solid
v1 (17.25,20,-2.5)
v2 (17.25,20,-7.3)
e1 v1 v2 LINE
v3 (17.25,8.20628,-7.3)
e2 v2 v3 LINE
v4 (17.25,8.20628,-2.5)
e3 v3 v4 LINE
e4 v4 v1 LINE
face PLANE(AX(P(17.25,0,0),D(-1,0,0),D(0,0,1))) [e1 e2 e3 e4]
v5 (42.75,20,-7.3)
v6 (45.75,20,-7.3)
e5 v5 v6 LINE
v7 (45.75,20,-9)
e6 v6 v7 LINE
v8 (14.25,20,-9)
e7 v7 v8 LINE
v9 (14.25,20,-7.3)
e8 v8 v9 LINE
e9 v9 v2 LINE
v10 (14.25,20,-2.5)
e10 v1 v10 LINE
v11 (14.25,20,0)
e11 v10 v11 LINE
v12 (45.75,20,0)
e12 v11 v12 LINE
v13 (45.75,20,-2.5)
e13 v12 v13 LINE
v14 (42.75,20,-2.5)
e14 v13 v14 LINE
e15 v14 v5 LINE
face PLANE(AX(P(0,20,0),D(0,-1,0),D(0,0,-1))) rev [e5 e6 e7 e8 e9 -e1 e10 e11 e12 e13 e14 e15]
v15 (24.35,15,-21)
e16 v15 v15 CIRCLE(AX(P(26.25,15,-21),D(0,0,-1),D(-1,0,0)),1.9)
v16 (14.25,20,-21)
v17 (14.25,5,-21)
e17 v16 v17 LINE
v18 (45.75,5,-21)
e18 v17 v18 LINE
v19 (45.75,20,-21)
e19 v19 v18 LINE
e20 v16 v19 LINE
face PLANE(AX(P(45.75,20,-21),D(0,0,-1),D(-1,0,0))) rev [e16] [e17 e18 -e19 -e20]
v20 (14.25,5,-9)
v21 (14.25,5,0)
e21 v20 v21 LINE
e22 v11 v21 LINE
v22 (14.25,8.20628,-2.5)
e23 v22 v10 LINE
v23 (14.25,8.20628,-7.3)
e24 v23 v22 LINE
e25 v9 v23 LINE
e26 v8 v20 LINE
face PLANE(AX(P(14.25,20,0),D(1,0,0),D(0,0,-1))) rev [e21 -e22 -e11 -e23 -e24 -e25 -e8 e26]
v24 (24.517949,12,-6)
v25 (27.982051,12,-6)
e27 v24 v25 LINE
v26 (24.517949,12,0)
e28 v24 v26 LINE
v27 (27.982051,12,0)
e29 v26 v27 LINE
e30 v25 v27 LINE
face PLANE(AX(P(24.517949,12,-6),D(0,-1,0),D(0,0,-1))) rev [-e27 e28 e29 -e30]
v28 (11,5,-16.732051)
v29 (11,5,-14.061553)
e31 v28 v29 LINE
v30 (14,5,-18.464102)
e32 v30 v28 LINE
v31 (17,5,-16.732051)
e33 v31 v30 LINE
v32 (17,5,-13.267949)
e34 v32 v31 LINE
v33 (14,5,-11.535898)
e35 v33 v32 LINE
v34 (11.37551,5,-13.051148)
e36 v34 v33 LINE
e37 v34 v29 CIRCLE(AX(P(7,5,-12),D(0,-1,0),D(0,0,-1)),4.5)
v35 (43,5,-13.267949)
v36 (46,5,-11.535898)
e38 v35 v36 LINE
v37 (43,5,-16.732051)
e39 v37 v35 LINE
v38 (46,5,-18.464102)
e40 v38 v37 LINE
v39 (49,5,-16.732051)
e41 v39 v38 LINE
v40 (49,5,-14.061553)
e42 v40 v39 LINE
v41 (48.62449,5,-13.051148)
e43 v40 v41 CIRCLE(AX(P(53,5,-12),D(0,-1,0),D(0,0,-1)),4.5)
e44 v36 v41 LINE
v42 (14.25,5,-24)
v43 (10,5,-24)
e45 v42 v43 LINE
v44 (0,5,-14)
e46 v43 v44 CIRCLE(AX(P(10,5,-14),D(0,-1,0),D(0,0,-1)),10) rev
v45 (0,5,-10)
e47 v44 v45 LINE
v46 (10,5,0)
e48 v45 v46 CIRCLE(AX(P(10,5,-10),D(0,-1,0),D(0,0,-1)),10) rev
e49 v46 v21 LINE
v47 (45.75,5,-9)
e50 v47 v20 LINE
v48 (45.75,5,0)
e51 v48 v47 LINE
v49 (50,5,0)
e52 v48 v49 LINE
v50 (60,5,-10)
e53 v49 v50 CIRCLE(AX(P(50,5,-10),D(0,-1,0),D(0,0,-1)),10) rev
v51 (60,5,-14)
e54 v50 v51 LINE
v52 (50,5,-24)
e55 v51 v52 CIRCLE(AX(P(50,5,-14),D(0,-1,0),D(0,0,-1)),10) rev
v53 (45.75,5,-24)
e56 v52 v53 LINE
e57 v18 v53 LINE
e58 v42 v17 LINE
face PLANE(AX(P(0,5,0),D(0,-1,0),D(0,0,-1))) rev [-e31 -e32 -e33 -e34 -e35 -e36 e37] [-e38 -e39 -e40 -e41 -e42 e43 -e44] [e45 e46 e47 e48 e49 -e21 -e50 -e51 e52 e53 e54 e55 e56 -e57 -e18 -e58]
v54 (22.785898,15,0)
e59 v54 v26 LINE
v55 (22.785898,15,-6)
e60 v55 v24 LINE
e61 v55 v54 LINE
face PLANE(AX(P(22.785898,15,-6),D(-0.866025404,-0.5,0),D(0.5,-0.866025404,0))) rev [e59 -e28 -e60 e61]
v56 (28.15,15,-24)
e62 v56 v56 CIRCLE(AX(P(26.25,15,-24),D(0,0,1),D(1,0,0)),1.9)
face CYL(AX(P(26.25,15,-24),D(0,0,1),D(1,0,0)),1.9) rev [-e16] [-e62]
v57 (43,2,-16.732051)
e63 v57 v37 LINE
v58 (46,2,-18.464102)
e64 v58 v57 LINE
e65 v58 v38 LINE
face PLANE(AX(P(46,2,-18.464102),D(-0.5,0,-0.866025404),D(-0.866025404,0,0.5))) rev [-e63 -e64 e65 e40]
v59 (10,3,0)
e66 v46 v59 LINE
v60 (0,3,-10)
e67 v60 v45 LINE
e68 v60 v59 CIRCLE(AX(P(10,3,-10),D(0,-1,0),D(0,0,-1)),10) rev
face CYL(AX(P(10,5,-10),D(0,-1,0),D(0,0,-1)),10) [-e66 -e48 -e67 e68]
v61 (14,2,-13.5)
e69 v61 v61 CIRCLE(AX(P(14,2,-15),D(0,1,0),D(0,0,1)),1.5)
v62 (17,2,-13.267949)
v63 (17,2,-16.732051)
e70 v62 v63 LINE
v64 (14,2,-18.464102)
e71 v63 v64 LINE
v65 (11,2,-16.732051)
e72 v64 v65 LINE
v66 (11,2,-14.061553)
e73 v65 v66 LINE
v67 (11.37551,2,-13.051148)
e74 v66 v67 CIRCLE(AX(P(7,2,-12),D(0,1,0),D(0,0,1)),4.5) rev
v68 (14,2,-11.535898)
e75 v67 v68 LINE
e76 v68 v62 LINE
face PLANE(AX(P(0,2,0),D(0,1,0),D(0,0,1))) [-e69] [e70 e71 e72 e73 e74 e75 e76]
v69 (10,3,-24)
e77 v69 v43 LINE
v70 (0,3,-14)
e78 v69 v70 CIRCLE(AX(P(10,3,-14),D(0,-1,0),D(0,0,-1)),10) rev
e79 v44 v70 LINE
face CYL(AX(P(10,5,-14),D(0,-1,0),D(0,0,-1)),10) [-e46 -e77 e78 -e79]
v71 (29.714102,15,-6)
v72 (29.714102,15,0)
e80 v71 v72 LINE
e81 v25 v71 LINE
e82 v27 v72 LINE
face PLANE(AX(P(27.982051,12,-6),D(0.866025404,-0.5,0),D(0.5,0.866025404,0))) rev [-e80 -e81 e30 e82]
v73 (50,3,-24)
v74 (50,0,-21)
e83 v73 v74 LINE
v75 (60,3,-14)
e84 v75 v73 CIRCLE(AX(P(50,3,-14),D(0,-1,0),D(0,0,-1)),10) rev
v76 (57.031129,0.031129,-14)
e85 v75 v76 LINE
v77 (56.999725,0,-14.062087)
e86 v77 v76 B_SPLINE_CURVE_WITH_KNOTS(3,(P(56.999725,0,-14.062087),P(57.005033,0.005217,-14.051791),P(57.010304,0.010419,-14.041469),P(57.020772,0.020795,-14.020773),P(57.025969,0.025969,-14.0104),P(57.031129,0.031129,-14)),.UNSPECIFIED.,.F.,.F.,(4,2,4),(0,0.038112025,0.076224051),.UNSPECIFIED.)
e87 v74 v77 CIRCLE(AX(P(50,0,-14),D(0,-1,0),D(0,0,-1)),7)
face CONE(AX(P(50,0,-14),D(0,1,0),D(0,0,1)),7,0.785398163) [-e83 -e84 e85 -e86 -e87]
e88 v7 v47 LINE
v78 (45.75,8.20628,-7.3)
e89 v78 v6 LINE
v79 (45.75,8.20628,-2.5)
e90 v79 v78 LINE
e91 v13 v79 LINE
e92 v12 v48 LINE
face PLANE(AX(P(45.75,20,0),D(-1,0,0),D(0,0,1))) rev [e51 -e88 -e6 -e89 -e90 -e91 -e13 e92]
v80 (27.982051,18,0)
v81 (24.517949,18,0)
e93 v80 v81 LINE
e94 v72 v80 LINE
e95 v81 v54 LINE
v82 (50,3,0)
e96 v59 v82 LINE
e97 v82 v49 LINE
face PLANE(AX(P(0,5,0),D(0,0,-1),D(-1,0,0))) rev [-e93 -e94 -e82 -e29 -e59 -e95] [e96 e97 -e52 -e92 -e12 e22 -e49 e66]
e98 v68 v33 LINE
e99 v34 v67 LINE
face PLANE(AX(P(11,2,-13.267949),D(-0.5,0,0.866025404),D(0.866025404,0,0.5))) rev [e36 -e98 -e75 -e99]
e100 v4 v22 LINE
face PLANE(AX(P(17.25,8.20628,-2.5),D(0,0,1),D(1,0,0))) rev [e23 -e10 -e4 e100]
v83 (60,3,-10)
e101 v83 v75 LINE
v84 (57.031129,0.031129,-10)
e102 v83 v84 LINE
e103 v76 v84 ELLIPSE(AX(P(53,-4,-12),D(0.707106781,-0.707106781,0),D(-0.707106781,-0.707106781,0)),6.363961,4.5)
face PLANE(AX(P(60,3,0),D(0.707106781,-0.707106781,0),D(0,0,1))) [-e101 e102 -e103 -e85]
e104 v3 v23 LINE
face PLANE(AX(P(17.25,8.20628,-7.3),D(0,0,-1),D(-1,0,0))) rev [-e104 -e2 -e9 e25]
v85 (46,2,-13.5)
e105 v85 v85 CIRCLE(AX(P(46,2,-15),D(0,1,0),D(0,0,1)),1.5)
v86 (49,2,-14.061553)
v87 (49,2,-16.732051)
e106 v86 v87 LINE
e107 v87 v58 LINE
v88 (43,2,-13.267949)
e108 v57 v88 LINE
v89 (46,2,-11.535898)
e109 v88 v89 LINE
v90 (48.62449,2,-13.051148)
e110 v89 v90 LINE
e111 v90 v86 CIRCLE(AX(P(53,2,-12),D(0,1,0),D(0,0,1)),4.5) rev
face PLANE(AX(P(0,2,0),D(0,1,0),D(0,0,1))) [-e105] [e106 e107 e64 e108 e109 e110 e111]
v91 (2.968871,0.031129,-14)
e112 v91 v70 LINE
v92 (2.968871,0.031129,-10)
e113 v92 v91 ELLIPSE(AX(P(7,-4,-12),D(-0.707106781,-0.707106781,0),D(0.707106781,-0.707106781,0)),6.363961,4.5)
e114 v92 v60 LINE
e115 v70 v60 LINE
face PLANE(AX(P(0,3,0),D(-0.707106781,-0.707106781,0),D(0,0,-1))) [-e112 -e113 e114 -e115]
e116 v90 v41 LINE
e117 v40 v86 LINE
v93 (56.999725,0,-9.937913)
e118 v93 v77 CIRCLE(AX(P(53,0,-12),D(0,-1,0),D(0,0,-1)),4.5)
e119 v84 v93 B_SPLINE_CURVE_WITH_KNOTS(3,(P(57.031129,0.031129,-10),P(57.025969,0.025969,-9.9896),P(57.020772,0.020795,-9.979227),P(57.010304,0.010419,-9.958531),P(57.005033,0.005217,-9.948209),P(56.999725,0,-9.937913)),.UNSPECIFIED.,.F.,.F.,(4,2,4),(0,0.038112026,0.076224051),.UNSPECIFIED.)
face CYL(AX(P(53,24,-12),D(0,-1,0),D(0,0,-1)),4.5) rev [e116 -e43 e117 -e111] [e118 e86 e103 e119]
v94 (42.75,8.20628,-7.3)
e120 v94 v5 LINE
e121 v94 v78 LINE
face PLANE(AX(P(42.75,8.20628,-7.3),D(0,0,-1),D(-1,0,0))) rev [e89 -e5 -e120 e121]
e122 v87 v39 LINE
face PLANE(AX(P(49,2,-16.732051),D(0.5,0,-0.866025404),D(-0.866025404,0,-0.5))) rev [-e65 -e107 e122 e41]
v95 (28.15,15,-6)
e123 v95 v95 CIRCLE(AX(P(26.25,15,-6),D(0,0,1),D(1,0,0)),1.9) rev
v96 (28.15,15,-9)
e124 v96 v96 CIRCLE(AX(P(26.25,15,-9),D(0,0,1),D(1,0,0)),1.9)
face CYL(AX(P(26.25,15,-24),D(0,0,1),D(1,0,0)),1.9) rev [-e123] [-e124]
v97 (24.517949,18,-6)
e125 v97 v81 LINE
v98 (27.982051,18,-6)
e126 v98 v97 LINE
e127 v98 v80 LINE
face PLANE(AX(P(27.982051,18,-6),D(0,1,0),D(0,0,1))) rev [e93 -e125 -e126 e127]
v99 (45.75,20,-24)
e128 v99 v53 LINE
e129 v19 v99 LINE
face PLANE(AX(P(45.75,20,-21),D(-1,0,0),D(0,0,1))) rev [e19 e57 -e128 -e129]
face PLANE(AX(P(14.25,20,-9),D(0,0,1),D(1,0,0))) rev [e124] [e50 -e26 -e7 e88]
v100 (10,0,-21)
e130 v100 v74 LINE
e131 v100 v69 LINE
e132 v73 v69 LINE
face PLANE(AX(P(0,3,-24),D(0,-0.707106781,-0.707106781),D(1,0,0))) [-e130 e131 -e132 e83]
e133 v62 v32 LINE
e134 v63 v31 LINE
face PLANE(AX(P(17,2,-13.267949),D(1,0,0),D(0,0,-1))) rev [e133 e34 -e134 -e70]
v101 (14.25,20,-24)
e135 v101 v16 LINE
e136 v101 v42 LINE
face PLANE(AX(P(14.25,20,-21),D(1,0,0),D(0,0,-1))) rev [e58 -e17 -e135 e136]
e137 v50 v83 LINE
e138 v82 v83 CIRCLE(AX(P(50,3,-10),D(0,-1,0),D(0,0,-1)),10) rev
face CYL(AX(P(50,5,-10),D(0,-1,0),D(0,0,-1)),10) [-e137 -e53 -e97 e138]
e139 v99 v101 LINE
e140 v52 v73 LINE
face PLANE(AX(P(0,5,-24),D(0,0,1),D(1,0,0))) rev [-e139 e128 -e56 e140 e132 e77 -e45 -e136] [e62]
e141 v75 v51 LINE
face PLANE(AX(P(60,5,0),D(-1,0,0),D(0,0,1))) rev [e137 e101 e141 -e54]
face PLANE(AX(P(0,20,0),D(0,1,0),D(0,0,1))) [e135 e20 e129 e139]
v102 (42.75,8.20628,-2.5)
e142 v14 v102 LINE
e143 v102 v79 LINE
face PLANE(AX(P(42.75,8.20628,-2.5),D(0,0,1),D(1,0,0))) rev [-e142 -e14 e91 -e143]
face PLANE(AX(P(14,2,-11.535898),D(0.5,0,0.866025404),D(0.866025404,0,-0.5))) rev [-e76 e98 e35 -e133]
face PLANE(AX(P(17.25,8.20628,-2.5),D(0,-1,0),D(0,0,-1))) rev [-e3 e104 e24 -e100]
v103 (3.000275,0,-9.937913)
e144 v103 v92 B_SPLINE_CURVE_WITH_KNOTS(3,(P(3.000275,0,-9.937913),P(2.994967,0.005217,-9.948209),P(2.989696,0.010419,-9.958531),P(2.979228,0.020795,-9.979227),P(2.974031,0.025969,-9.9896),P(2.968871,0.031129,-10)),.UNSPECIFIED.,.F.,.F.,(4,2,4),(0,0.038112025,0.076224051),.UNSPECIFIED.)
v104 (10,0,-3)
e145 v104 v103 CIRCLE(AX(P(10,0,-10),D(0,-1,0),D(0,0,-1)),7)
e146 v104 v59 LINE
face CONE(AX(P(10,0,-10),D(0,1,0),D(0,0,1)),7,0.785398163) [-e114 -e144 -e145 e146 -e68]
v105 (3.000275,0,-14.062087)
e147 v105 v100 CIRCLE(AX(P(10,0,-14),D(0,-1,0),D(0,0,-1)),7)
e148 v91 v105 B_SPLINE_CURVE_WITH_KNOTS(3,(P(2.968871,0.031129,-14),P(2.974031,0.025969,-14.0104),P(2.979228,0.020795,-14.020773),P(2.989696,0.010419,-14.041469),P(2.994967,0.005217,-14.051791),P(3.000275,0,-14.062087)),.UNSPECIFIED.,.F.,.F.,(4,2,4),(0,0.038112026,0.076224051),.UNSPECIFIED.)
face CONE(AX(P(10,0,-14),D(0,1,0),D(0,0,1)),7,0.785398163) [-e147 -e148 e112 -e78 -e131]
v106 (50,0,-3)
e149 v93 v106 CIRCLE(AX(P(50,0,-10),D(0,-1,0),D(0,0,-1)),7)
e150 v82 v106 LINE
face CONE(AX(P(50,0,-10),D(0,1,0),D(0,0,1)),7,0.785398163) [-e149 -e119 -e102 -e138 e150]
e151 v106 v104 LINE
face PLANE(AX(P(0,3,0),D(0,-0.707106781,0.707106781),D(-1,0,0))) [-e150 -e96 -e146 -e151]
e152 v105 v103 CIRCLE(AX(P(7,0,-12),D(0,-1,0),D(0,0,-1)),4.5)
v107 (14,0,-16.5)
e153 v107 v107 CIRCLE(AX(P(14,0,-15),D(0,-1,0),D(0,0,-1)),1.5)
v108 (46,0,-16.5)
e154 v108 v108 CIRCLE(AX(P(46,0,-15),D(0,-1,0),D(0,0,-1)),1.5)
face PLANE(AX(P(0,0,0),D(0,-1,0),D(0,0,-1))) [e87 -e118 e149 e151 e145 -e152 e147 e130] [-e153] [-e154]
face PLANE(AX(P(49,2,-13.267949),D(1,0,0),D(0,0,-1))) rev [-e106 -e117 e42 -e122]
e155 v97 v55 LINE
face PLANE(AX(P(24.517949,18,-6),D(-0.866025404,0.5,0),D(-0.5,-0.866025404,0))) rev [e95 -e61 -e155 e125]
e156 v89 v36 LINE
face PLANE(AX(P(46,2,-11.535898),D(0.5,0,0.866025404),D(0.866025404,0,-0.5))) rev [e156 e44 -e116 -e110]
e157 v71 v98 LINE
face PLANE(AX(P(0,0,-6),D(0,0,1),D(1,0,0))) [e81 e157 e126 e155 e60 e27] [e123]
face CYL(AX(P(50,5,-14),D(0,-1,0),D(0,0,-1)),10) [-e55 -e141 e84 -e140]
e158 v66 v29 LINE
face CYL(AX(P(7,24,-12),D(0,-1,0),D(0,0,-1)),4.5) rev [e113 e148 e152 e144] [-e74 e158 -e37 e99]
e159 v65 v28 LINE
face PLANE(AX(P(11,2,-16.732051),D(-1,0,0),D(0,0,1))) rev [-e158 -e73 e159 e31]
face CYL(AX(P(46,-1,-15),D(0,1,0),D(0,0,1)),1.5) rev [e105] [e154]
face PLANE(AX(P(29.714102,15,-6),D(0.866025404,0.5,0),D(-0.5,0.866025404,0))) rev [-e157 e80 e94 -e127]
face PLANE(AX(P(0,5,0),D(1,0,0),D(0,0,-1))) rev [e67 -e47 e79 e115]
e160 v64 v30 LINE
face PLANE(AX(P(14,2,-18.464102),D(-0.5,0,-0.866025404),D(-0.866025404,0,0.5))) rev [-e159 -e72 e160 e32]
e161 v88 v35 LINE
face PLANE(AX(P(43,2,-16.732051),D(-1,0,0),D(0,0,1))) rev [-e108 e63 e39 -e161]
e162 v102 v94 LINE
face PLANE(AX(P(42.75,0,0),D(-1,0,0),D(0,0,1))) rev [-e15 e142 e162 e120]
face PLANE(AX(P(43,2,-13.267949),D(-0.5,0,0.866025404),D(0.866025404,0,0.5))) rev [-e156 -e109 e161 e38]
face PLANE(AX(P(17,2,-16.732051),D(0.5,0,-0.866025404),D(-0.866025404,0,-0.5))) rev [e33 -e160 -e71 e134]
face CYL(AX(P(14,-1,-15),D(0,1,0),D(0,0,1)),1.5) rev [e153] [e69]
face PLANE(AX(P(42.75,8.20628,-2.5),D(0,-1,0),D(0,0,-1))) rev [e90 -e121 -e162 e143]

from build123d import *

# Parameters (mm, degrees)
SKETCH_1_W          = 60
SKETCH_1_H          = 24
EXTRUDE_1_DEPTH     = 5
SKETCH_2_W          = 31.5
SKETCH_2_H          = 9
SKETCH_2_H_2        = 3
EXTRUDE_2_DEPTH     = 15
SKETCH_3_R          = 1.9
CUT_EXTRUDE_1_DEPTH = 24
SKETCH_4_R          = 4.5
CUT_EXTRUDE_2_DEPTH = 24
FILLET_1_R          = 10
CUT_EXTRUDE_3_DEPTH = 3
SKETCH_7_R          = 1.5
CUT_EXTRUDE_4_DEPTH = 3
CUT_EXTRUDE_5_DEPTH = 6
SKETCH_9_W          = 4.8
SKETCH_9_H          = 12.477545801
CUT_EXTRUDE_6_DEPTH = 3
SKETCH_10_W         = 4.8
SKETCH_10_H         = 29.172350056
CUT_EXTRUDE_7_DEPTH = 3
CHAMFER_1_SIZE      = 3


with BuildPart() as part:
    # Эскиз1 → Бобышка-Вытянуть1 (new body)
    with BuildSketch(Plane(origin=(0, 0, 0), x_dir=(1, 0, 0), z_dir=(0, 1, 0))):
        with Locations((30, 12)):
            Rectangle(SKETCH_1_W, SKETCH_1_H)
    extrude(amount=EXTRUDE_1_DEPTH)

    # Эскиз2 → Бобышка-Вытянуть2 (add)
    with BuildSketch(Plane(origin=(0, 5, 0), x_dir=(1, 0, 0), z_dir=(0, 1, 0))):
        with Locations((30, 4.5)):
            Rectangle(SKETCH_2_W, SKETCH_2_H)
        with Locations((30, 22.5)):
            Rectangle(SKETCH_2_W, SKETCH_2_H_2)
    extrude(amount=EXTRUDE_2_DEPTH)

    # Эскиз3 → Вырез-Вытянуть1 (cut)
    with BuildSketch(Plane.XY):
        with Locations((26.25, 15)):
            Circle(SKETCH_3_R)
    extrude(amount=-CUT_EXTRUDE_1_DEPTH, mode=Mode.SUBTRACT)

    # Эскиз4 → Вырез-Вытянуть2 (cut)
    with BuildSketch(Plane.XZ):
        with Locations(Location((7, -12, 0), (0, 0, 270))):
            Circle(SKETCH_4_R)
        with Locations(Location((53, -12, 0), (0, 0, 270))):
            Circle(SKETCH_4_R)
    extrude(amount=-CUT_EXTRUDE_2_DEPTH, mode=Mode.SUBTRACT)

    # Скругление1
    fillet_1_edges = [part.edges().sort_by_distance(p)[0] for p in [
        (0, 2.5, -24),
        (60, 2.5, -24),
        (60, 2.5, 0),
        (0, 2.5, 0),
    ]]
    fillet(fillet_1_edges, radius=FILLET_1_R)

    # Эскиз5 → Вырез-Вытянуть3 (cut)
    with BuildSketch(Plane(origin=(0, 5, 0), x_dir=(1, 0, 0), z_dir=(0, 1, 0))):
        Polygon((43, 16.732050808), (43, 13.267949192), (46, 11.535898385), (49, 13.267949192), (49, 16.732050808), (46, 18.464101615), align=None)
        Polygon((11, 16.732050808), (11, 13.267949192), (14, 11.535898385), (17, 13.267949192), (17, 16.732050808), (14, 18.464101615), align=None)
    extrude(amount=-CUT_EXTRUDE_3_DEPTH, mode=Mode.SUBTRACT)

    # Эскиз7 → Вырез-Вытянуть4 (cut)
    with BuildSketch(Plane(origin=(0, 2, 0), x_dir=(1, 0, 0), z_dir=(0, 1, 0))):
        with Locations(Location((14, 15, 0), (0, 0, 270))):
            Circle(SKETCH_7_R)
        with Locations(Location((46, 15, 0), (0, 0, 270))):
            Circle(SKETCH_7_R)
    extrude(amount=-CUT_EXTRUDE_4_DEPTH, mode=Mode.SUBTRACT)

    # Эскиз8 → Вырез-Вытянуть5 (cut)
    with BuildSketch(Plane.XY):
        Polygon((27.982050808, 18), (24.517949192, 18), (22.785898385, 15), (24.517949192, 12), (27.982050808, 12), (29.714101615, 15), align=None)
    extrude(amount=-CUT_EXTRUDE_5_DEPTH, mode=Mode.SUBTRACT)

    # Эскиз9 → Вырез-Вытянуть6 (cut)
    with BuildSketch(Plane.ZY.offset(-14.25)):
        with Locations((-4.9, 14.445052705)):
            Rectangle(SKETCH_9_W, SKETCH_9_H)
    extrude(amount=-CUT_EXTRUDE_6_DEPTH, mode=Mode.SUBTRACT)

    # Эскиз10 → Вырез-Вытянуть7 (cut)
    with BuildSketch(Plane(origin=(45.75, 0, 0), x_dir=(0, 0, -1), z_dir=(1, 0, 0))):
        with Locations((4.9, 22.792454832)):
            Rectangle(SKETCH_10_W, SKETCH_10_H)
    extrude(amount=-CUT_EXTRUDE_7_DEPTH, mode=Mode.SUBTRACT)

    # Фаска1
    # the kernel refuses this chamfer: 3 mm, written as the material it takes off along each edge
    with BuildSketch(Plane(origin=(50, 0, -24), x_dir=(0, -0.02749587661058636, 0.9996219169112968), z_dir=(-1, 0, 0))) as chamfer_1_piece_1:
        Polygon((CHAMFER_1_SIZE * 0.999621916911, CHAMFER_1_SIZE * 0.0274958766106), (-CHAMFER_1_SIZE * 0.0274958766106, CHAMFER_1_SIZE * 0.999621916911), (0, 0), align=None)
    extrude(amount=40, mode=Mode.SUBTRACT)
    with BuildSketch(Plane(origin=(0, 0, -14), x_dir=(0.9996219169112968, -0.02749587661058636, 0), z_dir=(0, 0, 1)), Plane(origin=(60, 0, -10), x_dir=(-0.9996219169112968, -0.02749587661058636, 0), z_dir=(0, 0, -1))) as chamfer_1_piece_2:
        Polygon((CHAMFER_1_SIZE * 0.999621916911, CHAMFER_1_SIZE * 0.0274958766106), (-CHAMFER_1_SIZE * 0.0274958766106, CHAMFER_1_SIZE * 0.999621916911), (0, 0), align=None)
    extrude(amount=4, mode=Mode.SUBTRACT)
    with BuildSketch(Plane(origin=(10, 0, 0), x_dir=(0, 0.9996219169112968, 0.027495876610586372), z_dir=(1, 0, 0))) as chamfer_1_piece_3:
        Polygon((CHAMFER_1_SIZE * 0.999621916911, -CHAMFER_1_SIZE * 0.0274958766106), (-CHAMFER_1_SIZE * 0.0274958766106, -CHAMFER_1_SIZE * 0.999621916911), (0, 0), align=None)
    extrude(amount=40, mode=Mode.SUBTRACT)
    with BuildSketch(Plane(origin=(10, 0, -14), x_dir=(-1, 0, 0), z_dir=(0, 0, 1))) as chamfer_1_piece_4:
        Polygon((10 - CHAMFER_1_SIZE, 0), (10, -CHAMFER_1_SIZE), (10, 0), align=None)
    revolve(axis=Axis((10, 0, -14), (0, -1, 0)), revolution_arc=90, mode=Mode.SUBTRACT)
    with BuildSketch(Plane(origin=(10, 0, -10), x_dir=(0, 0, 1), z_dir=(1, 0, 0))) as chamfer_1_piece_5:
        Polygon((10 - CHAMFER_1_SIZE, 0), (10, -CHAMFER_1_SIZE), (10, 0), align=None)
    revolve(axis=Axis((10, 0, -10), (0, -1, 0)), revolution_arc=90, mode=Mode.SUBTRACT)
    with BuildSketch(Plane(origin=(50, 0, -10), x_dir=(0, 0, 1), z_dir=(-1, 0, 0))) as chamfer_1_piece_6:
        Polygon((10 - CHAMFER_1_SIZE, 0), (10, CHAMFER_1_SIZE), (10, 0), align=None)
    revolve(axis=Axis((50, 0, -10), (0, 1, 0)), revolution_arc=90, mode=Mode.SUBTRACT)
    with BuildSketch(Plane(origin=(50, 0, -14), x_dir=(1, 0, 0), z_dir=(0, 0, 1))) as chamfer_1_piece_7:
        Polygon((10 - CHAMFER_1_SIZE, 0), (10, CHAMFER_1_SIZE), (10, 0), align=None)
    revolve(axis=Axis((50, 0, -14), (0, 1, 0)), revolution_arc=90, mode=Mode.SUBTRACT)


solid = part.part
